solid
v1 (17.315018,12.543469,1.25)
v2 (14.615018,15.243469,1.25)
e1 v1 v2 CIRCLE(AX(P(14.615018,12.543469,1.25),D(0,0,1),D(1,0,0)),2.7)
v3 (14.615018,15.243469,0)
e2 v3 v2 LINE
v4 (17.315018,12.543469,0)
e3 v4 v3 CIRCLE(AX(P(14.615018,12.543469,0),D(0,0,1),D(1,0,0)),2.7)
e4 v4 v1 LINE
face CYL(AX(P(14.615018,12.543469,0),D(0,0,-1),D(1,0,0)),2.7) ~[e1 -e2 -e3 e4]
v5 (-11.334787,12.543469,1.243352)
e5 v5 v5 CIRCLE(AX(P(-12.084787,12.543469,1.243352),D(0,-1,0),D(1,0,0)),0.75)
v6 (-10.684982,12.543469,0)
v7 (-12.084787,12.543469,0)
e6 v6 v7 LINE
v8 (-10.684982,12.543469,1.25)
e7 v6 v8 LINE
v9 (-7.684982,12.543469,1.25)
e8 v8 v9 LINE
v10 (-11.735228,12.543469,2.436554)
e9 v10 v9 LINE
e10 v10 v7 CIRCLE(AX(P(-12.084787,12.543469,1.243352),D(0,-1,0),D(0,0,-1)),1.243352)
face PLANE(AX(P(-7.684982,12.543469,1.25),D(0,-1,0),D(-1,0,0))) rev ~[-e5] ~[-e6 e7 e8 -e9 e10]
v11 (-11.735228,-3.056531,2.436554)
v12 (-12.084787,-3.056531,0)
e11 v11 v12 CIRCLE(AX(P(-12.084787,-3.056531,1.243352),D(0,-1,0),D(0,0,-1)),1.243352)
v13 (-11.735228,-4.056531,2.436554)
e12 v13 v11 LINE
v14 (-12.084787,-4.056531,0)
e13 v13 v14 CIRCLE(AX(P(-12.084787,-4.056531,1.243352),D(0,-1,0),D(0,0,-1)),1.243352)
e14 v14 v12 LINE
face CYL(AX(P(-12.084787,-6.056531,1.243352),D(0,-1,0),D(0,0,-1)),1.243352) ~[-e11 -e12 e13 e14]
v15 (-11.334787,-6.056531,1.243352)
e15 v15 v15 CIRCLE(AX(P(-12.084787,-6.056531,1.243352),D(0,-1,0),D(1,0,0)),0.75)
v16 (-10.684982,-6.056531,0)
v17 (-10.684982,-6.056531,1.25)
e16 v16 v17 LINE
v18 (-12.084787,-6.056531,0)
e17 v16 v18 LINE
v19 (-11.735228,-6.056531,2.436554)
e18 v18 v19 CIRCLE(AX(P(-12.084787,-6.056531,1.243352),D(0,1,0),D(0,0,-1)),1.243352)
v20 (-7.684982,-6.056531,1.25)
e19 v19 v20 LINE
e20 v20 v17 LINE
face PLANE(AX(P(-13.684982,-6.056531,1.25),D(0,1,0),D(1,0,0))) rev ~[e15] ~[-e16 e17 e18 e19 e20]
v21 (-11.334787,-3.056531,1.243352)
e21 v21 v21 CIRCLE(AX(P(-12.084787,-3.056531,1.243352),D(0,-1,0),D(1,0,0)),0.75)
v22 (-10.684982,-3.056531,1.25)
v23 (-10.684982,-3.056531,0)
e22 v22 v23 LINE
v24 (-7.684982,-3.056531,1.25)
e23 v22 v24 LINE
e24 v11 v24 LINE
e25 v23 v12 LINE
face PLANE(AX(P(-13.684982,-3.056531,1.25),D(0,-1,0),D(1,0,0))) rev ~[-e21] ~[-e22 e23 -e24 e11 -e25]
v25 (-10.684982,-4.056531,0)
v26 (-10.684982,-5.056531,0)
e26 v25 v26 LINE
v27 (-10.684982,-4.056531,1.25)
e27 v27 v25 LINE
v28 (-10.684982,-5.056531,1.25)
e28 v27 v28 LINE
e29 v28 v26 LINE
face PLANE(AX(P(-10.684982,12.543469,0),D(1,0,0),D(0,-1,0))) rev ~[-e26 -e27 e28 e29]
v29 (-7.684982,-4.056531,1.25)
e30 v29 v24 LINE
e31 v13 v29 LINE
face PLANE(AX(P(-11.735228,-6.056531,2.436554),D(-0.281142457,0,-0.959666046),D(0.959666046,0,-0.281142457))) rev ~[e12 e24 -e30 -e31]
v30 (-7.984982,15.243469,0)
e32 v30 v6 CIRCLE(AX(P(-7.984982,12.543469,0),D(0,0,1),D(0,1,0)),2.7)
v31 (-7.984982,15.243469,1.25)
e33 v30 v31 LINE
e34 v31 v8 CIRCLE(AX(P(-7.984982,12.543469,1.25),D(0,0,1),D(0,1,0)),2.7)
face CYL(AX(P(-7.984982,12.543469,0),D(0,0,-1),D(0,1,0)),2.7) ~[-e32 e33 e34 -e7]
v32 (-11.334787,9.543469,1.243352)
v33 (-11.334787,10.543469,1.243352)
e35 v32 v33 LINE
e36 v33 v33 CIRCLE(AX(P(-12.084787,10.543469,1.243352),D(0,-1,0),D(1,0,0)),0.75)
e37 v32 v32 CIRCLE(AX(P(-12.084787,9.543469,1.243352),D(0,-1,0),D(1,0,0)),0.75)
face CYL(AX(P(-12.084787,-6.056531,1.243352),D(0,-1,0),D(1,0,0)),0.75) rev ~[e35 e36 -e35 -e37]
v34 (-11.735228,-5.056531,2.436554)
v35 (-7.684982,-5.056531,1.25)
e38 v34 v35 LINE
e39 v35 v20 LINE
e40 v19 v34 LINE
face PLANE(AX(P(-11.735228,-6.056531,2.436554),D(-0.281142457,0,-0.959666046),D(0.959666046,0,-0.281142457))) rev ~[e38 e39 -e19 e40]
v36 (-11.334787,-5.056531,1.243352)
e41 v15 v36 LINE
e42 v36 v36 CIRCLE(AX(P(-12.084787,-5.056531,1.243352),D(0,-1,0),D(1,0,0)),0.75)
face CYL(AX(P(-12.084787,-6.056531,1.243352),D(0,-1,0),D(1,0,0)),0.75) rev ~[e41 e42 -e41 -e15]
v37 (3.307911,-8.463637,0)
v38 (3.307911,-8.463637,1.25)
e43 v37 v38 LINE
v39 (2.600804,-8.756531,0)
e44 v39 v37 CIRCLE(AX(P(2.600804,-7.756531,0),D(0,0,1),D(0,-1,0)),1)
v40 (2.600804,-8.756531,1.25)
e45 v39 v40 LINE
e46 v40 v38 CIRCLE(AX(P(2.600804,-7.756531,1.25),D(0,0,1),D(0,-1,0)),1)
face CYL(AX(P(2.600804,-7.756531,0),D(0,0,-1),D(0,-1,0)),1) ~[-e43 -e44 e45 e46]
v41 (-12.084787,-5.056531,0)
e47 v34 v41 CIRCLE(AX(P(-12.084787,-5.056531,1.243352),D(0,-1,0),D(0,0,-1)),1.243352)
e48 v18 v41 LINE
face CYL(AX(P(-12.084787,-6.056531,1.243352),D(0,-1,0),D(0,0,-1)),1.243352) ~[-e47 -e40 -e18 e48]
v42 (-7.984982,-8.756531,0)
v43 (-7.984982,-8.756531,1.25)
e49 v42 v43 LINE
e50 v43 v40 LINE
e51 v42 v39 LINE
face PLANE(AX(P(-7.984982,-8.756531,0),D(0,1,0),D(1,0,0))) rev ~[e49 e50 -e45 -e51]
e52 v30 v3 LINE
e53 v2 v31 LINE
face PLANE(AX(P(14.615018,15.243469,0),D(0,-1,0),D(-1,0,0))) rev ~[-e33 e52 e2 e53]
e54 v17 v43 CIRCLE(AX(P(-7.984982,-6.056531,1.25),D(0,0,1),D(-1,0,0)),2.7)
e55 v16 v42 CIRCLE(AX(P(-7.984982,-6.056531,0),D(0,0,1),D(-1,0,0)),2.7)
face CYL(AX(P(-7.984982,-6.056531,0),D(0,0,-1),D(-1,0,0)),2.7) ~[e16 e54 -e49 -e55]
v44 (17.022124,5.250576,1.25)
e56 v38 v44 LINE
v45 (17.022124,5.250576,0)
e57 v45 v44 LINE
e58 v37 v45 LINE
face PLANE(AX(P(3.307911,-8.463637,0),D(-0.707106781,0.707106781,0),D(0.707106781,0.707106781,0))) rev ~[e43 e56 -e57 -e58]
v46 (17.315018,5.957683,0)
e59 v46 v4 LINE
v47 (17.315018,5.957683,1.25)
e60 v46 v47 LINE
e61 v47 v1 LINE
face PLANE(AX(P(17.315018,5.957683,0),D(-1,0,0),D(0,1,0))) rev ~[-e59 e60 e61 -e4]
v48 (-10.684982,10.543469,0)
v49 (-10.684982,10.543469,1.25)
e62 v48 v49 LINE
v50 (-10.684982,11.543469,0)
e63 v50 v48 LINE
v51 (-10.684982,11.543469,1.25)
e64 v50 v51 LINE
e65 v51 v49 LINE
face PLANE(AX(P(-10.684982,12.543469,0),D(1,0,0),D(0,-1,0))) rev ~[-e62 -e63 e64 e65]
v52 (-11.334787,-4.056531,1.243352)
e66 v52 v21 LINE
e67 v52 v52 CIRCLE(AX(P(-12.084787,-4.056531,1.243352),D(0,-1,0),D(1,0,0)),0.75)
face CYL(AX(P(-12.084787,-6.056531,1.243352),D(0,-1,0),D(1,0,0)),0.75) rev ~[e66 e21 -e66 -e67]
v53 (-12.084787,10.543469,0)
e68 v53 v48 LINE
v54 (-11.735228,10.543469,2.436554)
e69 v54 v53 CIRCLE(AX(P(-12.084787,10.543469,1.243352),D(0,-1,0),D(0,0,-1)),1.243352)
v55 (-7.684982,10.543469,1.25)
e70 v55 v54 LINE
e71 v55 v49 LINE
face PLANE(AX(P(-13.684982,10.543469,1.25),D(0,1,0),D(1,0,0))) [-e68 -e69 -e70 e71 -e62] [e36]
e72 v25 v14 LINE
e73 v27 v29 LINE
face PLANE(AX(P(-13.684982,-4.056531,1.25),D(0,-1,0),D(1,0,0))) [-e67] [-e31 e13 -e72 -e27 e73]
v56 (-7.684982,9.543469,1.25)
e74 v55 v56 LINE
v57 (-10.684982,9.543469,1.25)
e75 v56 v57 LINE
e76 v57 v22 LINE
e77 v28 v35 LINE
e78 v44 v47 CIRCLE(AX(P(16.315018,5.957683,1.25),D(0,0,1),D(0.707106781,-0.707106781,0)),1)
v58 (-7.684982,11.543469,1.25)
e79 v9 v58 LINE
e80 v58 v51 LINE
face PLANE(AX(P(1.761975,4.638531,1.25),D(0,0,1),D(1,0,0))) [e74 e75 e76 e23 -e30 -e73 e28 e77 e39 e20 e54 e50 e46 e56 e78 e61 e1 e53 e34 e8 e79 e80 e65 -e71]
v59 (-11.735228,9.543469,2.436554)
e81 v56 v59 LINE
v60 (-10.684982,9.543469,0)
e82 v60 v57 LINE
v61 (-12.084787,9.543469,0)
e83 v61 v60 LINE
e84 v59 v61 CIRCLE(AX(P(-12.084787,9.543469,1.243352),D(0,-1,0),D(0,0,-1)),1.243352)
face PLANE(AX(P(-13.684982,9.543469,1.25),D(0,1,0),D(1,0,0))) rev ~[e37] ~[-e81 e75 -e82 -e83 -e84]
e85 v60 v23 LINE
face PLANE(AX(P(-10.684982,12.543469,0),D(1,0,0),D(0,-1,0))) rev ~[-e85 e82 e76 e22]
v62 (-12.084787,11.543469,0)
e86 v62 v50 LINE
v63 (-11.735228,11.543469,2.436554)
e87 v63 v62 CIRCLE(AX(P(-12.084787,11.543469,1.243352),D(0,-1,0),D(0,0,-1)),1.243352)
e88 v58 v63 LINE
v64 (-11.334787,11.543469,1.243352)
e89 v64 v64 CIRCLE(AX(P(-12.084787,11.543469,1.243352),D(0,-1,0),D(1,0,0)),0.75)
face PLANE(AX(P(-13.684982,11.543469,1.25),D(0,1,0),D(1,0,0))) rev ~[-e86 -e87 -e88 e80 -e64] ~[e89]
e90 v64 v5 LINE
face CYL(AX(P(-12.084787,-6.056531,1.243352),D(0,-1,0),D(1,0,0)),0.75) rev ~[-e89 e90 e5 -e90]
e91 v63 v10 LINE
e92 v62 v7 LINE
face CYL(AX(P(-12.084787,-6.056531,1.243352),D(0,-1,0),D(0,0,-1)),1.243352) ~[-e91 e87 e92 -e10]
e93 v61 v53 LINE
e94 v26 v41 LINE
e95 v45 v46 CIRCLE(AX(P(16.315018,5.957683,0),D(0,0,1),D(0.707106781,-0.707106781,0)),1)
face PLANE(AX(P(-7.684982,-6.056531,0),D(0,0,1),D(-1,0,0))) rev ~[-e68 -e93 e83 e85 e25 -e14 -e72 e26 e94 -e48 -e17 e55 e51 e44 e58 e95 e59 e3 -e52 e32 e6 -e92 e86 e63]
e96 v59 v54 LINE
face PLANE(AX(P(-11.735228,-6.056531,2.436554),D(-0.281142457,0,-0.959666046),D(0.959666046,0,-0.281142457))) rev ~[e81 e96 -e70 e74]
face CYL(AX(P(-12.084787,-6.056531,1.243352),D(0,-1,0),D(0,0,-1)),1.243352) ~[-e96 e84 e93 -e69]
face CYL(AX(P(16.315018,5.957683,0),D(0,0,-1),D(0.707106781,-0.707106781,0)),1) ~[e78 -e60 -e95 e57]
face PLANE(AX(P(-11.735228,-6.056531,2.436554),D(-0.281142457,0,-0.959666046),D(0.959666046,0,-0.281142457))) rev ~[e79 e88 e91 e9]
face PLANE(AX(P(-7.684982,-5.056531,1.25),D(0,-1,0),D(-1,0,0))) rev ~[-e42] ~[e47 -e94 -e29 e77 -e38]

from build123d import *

# Parameters (mm, degrees)
F1_DEPTH = 1.25
F2_W     = 6
F2_H     = 1
F3_DEPTH = 2.5
F4_R     = 0.75
F5_DEPTH = 75


# Not quite as in the source:
# - a feature names something its author has since deleted; it is built from what else it names


with BuildPart() as f1:
    # F0 (on Top) → F1 (new body)
    with BuildSketch(Plane.XY):
        with BuildLine():
            ThreePointArc((-7.984982332, 15.2434693582), (-9.8941706412, 14.4526576674), (-10.684982332, 12.5434693582))
            Line((-10.684982332, 12.5434693582), (-10.684982332, -6.0565306418))
            ThreePointArc((-10.684982332, -6.0565306418), (-9.8941706412, -7.965718951), (-7.984982332, -8.7565306418))
            Line((-7.984982332, -8.7565306418), (2.6008041056, -8.7565306418))
            ThreePointArc((2.6008041056, -8.7565306418), (2.983487538, -8.6804101743), (3.3079108868, -8.463637423))
            Line((3.3079108868, -8.463637423), (17.0221244492, 5.2505761394))
            ThreePointArc((17.0221244492, 5.2505761394), (17.2388972005, 5.5749994882), (17.315017668, 5.9576829206))
            Line((17.315017668, 5.9576829206), (17.315017668, 12.5434693582))
            ThreePointArc((17.315017668, 12.5434693582), (16.5242059772, 14.4526576674), (14.615017668, 15.2434693582))
            Line((14.615017668, 15.2434693582), (-7.984982332, 15.2434693582))
        make_face()
    extrude(amount=F1_DEPTH)

    # F2 (on face) → F3 (join, symmetric)
    with BuildSketch(Plane.XY.offset(1.25)):
        Polygon((-7.684982332, 12.5434693582), (-10.684982332, 12.5434693582), (-13.684982332, 12.5434693582), (-13.684982332, 11.5434693582), (-10.684982332, 11.5434693582), (-7.684982332, 11.5434693582), align=None)
        with Locations((-10.684982332, 10.0434693582)):
            Rectangle(F2_W, F2_H)
        Polygon((-13.684982332, -6.0565306418), (-10.684982332, -6.0565306418), (-7.684982332, -6.0565306418), (-7.684982332, -5.0565306418), (-10.684982332, -5.0565306418), (-13.684982332, -5.0565306418), align=None)
        with Locations((-10.684982332, -3.5565306418)):
            Rectangle(F2_W, F2_H)
    extrude(amount=F3_DEPTH, both=True)

    # F4 (on face) → F5 (cut)
    with BuildSketch(Plane.XZ.offset(6.0565306418)):
        with BuildLine():
            Line((-11.7352277888, 2.4365543881), (-7.684982332, 1.25))
            Line((-7.684982332, 1.25), (-7.684982332, 3.75))
            Line((-7.684982332, 3.75), (-13.684982332, 3.75))
            Line((-13.684982332, 3.75), (-13.684982332, -1.25))
            Line((-13.684982332, -1.25), (-7.684982332, -1.25))
            Line((-7.684982332, -1.25), (-7.684982332, 0))
            Line((-7.684982332, 0), (-10.684982332, 0))
            Line((-10.684982332, 0), (-12.0847867802, 0))
            ThreePointArc((-12.0847867802, 0), (-13.3155374428, 1.4199208375), (-11.7352277888, 2.4365543881))
        make_face()
        with Locations((-12.0847867802, 1.2433518423)):
            Circle(F4_R)
    extrude(amount=-F5_DEPTH, mode=Mode.SUBTRACT)


solid = f1.part
